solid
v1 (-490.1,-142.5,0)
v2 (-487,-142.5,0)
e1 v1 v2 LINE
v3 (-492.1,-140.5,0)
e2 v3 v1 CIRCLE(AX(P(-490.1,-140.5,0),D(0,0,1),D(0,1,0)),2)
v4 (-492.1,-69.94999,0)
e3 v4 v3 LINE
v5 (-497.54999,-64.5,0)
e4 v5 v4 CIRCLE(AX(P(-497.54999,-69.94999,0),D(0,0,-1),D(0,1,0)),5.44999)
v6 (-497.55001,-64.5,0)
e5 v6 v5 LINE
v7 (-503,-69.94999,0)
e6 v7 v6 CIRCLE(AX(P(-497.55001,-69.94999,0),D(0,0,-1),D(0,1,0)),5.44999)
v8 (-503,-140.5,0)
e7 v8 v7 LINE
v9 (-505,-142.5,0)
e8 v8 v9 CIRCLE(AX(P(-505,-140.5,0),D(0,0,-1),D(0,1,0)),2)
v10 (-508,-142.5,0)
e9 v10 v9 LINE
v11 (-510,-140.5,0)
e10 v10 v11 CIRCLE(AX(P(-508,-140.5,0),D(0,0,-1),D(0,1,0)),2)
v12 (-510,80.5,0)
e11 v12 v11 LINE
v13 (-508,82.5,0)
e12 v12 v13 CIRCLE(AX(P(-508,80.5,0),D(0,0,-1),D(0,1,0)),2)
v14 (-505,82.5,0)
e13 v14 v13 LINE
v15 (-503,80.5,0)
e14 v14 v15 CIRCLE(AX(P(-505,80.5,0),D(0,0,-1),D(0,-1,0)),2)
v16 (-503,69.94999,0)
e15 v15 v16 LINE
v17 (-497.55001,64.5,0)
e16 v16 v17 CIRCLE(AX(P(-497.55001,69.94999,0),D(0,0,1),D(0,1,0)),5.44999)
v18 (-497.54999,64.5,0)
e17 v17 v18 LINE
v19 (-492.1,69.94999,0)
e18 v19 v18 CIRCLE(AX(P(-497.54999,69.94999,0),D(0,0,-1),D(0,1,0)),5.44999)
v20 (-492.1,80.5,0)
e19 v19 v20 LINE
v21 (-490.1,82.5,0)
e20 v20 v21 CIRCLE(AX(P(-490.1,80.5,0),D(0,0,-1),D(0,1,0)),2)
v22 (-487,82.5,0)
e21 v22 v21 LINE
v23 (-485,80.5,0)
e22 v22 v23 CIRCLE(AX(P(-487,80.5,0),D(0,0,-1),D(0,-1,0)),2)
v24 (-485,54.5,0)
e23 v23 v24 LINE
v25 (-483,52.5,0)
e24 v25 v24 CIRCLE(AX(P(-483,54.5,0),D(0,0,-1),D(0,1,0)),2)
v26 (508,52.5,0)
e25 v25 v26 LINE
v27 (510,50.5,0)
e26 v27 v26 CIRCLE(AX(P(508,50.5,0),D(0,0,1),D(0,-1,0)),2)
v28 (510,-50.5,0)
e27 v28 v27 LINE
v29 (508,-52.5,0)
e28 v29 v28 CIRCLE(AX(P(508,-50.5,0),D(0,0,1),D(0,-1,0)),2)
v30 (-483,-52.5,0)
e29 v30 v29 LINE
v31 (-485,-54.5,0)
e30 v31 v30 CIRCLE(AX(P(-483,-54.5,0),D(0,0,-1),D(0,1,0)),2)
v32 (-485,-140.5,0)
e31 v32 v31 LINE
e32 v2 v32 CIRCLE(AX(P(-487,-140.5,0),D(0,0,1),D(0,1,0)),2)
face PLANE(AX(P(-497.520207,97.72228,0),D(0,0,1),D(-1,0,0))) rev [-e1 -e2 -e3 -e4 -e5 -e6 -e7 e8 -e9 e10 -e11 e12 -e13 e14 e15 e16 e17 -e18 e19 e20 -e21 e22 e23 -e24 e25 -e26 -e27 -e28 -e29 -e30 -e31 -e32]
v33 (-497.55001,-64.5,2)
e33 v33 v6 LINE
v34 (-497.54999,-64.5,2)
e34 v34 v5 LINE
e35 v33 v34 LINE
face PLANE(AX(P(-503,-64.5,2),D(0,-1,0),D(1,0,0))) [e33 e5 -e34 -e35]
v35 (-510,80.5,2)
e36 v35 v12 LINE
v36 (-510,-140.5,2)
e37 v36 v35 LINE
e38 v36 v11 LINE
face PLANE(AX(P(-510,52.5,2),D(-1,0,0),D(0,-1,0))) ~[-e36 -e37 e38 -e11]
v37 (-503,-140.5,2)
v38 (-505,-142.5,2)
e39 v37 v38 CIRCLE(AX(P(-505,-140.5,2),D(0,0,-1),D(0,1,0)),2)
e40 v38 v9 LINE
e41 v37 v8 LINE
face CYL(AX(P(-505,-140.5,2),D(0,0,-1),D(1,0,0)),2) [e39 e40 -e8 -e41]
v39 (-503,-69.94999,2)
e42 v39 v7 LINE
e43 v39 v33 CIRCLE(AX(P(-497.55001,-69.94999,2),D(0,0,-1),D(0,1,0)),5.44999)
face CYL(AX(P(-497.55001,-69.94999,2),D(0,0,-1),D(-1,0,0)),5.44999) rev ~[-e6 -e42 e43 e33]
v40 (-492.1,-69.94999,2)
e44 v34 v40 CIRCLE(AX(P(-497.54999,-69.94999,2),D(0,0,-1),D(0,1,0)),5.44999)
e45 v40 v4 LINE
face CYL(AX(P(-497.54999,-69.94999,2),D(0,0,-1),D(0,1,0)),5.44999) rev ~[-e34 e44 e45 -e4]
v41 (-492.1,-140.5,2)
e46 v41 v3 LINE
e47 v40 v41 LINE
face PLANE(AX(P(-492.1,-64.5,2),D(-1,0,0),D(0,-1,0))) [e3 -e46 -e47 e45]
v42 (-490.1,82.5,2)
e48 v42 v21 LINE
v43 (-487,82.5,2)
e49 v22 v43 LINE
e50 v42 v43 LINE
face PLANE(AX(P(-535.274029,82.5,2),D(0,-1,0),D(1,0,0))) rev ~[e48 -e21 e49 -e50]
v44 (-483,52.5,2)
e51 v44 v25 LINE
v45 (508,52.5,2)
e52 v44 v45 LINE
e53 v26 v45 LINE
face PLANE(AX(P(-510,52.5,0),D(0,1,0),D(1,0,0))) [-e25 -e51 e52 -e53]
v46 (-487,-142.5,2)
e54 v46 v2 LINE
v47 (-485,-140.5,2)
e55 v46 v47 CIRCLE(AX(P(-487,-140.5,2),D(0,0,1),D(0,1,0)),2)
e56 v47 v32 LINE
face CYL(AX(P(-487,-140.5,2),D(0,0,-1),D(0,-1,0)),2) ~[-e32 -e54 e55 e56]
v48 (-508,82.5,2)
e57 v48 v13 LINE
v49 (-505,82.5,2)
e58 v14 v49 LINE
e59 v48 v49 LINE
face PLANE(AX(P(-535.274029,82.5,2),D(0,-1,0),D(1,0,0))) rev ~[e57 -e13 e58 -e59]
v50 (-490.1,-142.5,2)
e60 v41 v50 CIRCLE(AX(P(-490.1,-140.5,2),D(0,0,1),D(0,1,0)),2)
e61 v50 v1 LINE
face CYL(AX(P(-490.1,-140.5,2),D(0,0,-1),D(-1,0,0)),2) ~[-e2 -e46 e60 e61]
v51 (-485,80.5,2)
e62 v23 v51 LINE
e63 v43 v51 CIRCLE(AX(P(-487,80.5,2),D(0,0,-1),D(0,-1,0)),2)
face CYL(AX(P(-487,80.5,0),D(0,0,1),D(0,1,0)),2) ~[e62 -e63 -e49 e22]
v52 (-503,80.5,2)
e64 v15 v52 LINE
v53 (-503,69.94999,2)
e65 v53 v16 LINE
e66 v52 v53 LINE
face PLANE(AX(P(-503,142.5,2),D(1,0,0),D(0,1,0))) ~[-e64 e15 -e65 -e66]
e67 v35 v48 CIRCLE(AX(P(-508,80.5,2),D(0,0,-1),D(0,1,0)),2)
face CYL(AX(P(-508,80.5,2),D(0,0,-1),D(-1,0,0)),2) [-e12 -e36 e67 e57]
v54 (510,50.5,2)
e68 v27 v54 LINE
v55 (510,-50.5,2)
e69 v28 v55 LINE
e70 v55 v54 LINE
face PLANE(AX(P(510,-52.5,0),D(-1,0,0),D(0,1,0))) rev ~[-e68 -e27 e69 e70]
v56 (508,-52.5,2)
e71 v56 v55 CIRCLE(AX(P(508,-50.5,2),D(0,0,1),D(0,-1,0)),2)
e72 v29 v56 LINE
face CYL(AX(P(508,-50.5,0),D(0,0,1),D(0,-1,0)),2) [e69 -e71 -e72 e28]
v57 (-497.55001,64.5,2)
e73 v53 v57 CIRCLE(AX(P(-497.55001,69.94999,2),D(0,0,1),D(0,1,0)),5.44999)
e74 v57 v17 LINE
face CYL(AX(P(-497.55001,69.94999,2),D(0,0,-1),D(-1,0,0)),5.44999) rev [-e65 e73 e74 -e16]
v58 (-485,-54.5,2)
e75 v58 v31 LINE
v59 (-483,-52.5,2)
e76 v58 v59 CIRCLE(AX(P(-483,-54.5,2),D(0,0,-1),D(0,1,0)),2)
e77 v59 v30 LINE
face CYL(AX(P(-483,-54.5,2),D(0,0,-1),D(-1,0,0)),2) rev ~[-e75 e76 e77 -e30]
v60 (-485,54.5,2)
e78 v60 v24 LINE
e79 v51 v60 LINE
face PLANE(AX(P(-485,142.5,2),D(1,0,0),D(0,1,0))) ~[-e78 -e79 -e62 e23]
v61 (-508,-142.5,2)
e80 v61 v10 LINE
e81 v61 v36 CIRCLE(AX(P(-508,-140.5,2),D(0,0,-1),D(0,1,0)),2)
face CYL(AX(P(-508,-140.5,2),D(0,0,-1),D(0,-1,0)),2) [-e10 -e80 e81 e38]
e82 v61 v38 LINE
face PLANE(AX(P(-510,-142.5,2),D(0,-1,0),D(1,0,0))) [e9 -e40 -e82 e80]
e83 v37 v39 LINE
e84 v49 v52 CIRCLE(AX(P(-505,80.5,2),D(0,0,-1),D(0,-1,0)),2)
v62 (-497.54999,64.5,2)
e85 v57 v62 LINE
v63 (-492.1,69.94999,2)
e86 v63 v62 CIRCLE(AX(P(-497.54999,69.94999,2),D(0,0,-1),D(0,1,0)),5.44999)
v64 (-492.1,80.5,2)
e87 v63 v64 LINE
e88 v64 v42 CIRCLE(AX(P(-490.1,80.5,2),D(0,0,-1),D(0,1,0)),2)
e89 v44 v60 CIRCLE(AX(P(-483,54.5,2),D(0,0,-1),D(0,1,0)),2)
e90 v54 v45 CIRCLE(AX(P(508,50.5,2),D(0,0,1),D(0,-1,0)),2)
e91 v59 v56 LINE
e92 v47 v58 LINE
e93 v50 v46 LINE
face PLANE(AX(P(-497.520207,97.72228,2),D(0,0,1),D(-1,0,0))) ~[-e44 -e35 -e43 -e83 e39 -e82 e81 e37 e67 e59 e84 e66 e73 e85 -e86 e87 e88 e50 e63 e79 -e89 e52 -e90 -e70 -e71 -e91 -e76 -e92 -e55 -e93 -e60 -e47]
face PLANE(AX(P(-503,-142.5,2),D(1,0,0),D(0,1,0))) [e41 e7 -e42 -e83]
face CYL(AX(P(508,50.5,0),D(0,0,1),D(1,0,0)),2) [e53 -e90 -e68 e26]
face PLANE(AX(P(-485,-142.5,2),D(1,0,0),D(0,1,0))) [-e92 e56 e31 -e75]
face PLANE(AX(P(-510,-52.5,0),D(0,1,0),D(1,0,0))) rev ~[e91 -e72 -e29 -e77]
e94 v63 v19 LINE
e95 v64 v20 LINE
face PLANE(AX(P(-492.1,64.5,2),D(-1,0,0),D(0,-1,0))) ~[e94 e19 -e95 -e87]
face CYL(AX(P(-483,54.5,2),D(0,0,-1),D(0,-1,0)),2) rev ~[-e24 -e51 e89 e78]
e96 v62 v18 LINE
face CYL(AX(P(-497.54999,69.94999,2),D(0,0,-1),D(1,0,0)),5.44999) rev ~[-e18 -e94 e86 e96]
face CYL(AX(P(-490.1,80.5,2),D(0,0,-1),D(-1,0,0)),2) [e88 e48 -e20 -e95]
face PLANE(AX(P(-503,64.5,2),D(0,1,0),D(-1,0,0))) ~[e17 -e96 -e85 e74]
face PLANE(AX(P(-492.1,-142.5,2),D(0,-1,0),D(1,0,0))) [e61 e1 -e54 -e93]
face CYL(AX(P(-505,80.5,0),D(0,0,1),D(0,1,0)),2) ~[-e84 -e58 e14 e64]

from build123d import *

# Parameters (mm, degrees)
F0_W     = 1020
F0_H     = 105
F1_DEPTH = 2
F3_DEPTH = 2
F6_W     = 69.2964494228
F6_H     = 80
F7_DEPTH = 2.001
F8_R     = 5.44999
F9_R     = 2


# Not quite as in the source:
# - a fillet or chamfer is up to 0.001 mm smaller than in the source, because OpenCascade refuses the exact size


with BuildPart() as f1:
    # F0 (on Top) → F1 (new body)
    with BuildSketch(Plane.XY):
        Rectangle(F0_W, F0_H)
    extrude(amount=F1_DEPTH)

    # F2 (on face) → F3 (join)
    with BuildSketch(Plane.XY.offset(2)):
        Polygon((-485, -52.5), (-510, -52.5), (-510, -142.5), (-503, -142.5), (-503, -64.5), (-492.1, -64.5), (-492.1, -142.5), (-485, -142.5), align=None)
    extrude(amount=-F3_DEPTH)

    # F5: F1 across plane


with BuildPart() as f1_1:
    add(f1.part)
    add(f1.part.mirror(Plane.XZ))

    # F6 (on face) → F7 (cut, through all)
    with BuildSketch(Plane.XY.offset(2)):
        with Locations((-500.6258040667, 122.5)):
            Rectangle(F6_W, F6_H)
    extrude(amount=-F7_DEPTH, mode=Mode.SUBTRACT)

    # F8 (radius 5.45 in the source; OpenCascade refuses exactly that, so slightly less here)
    f8_edges = [f1_1.edges().sort_by_distance(p)[0] for p in [
        (-503, -64.5, 1),
        (-492.1, -64.5, 1),
        (-503, 64.5, 1),
        (-492.1, 64.5, 1),
    ]]
    fillet(f8_edges, radius=F8_R)

    # F9
    f9_edges = [f1_1.edges().sort_by_distance(p)[0] for p in [
        (-485, 52.5, 1),
        (-485, 82.5, 1),
        (-492.1, 82.5, 1),
        (-503, 82.5, 1),
        (-510, 82.5, 1),
        (-485, -52.5, 1),
        (-485, -142.5, 1),
        (-492.1, -142.5, 1),
        (-503, -142.5, 1),
        (-510, -142.5, 1),
        (510, -52.5, 1),
        (510, 52.5, 1),
    ]]
    fillet(f9_edges, radius=F9_R)


solid = f1_1.part
